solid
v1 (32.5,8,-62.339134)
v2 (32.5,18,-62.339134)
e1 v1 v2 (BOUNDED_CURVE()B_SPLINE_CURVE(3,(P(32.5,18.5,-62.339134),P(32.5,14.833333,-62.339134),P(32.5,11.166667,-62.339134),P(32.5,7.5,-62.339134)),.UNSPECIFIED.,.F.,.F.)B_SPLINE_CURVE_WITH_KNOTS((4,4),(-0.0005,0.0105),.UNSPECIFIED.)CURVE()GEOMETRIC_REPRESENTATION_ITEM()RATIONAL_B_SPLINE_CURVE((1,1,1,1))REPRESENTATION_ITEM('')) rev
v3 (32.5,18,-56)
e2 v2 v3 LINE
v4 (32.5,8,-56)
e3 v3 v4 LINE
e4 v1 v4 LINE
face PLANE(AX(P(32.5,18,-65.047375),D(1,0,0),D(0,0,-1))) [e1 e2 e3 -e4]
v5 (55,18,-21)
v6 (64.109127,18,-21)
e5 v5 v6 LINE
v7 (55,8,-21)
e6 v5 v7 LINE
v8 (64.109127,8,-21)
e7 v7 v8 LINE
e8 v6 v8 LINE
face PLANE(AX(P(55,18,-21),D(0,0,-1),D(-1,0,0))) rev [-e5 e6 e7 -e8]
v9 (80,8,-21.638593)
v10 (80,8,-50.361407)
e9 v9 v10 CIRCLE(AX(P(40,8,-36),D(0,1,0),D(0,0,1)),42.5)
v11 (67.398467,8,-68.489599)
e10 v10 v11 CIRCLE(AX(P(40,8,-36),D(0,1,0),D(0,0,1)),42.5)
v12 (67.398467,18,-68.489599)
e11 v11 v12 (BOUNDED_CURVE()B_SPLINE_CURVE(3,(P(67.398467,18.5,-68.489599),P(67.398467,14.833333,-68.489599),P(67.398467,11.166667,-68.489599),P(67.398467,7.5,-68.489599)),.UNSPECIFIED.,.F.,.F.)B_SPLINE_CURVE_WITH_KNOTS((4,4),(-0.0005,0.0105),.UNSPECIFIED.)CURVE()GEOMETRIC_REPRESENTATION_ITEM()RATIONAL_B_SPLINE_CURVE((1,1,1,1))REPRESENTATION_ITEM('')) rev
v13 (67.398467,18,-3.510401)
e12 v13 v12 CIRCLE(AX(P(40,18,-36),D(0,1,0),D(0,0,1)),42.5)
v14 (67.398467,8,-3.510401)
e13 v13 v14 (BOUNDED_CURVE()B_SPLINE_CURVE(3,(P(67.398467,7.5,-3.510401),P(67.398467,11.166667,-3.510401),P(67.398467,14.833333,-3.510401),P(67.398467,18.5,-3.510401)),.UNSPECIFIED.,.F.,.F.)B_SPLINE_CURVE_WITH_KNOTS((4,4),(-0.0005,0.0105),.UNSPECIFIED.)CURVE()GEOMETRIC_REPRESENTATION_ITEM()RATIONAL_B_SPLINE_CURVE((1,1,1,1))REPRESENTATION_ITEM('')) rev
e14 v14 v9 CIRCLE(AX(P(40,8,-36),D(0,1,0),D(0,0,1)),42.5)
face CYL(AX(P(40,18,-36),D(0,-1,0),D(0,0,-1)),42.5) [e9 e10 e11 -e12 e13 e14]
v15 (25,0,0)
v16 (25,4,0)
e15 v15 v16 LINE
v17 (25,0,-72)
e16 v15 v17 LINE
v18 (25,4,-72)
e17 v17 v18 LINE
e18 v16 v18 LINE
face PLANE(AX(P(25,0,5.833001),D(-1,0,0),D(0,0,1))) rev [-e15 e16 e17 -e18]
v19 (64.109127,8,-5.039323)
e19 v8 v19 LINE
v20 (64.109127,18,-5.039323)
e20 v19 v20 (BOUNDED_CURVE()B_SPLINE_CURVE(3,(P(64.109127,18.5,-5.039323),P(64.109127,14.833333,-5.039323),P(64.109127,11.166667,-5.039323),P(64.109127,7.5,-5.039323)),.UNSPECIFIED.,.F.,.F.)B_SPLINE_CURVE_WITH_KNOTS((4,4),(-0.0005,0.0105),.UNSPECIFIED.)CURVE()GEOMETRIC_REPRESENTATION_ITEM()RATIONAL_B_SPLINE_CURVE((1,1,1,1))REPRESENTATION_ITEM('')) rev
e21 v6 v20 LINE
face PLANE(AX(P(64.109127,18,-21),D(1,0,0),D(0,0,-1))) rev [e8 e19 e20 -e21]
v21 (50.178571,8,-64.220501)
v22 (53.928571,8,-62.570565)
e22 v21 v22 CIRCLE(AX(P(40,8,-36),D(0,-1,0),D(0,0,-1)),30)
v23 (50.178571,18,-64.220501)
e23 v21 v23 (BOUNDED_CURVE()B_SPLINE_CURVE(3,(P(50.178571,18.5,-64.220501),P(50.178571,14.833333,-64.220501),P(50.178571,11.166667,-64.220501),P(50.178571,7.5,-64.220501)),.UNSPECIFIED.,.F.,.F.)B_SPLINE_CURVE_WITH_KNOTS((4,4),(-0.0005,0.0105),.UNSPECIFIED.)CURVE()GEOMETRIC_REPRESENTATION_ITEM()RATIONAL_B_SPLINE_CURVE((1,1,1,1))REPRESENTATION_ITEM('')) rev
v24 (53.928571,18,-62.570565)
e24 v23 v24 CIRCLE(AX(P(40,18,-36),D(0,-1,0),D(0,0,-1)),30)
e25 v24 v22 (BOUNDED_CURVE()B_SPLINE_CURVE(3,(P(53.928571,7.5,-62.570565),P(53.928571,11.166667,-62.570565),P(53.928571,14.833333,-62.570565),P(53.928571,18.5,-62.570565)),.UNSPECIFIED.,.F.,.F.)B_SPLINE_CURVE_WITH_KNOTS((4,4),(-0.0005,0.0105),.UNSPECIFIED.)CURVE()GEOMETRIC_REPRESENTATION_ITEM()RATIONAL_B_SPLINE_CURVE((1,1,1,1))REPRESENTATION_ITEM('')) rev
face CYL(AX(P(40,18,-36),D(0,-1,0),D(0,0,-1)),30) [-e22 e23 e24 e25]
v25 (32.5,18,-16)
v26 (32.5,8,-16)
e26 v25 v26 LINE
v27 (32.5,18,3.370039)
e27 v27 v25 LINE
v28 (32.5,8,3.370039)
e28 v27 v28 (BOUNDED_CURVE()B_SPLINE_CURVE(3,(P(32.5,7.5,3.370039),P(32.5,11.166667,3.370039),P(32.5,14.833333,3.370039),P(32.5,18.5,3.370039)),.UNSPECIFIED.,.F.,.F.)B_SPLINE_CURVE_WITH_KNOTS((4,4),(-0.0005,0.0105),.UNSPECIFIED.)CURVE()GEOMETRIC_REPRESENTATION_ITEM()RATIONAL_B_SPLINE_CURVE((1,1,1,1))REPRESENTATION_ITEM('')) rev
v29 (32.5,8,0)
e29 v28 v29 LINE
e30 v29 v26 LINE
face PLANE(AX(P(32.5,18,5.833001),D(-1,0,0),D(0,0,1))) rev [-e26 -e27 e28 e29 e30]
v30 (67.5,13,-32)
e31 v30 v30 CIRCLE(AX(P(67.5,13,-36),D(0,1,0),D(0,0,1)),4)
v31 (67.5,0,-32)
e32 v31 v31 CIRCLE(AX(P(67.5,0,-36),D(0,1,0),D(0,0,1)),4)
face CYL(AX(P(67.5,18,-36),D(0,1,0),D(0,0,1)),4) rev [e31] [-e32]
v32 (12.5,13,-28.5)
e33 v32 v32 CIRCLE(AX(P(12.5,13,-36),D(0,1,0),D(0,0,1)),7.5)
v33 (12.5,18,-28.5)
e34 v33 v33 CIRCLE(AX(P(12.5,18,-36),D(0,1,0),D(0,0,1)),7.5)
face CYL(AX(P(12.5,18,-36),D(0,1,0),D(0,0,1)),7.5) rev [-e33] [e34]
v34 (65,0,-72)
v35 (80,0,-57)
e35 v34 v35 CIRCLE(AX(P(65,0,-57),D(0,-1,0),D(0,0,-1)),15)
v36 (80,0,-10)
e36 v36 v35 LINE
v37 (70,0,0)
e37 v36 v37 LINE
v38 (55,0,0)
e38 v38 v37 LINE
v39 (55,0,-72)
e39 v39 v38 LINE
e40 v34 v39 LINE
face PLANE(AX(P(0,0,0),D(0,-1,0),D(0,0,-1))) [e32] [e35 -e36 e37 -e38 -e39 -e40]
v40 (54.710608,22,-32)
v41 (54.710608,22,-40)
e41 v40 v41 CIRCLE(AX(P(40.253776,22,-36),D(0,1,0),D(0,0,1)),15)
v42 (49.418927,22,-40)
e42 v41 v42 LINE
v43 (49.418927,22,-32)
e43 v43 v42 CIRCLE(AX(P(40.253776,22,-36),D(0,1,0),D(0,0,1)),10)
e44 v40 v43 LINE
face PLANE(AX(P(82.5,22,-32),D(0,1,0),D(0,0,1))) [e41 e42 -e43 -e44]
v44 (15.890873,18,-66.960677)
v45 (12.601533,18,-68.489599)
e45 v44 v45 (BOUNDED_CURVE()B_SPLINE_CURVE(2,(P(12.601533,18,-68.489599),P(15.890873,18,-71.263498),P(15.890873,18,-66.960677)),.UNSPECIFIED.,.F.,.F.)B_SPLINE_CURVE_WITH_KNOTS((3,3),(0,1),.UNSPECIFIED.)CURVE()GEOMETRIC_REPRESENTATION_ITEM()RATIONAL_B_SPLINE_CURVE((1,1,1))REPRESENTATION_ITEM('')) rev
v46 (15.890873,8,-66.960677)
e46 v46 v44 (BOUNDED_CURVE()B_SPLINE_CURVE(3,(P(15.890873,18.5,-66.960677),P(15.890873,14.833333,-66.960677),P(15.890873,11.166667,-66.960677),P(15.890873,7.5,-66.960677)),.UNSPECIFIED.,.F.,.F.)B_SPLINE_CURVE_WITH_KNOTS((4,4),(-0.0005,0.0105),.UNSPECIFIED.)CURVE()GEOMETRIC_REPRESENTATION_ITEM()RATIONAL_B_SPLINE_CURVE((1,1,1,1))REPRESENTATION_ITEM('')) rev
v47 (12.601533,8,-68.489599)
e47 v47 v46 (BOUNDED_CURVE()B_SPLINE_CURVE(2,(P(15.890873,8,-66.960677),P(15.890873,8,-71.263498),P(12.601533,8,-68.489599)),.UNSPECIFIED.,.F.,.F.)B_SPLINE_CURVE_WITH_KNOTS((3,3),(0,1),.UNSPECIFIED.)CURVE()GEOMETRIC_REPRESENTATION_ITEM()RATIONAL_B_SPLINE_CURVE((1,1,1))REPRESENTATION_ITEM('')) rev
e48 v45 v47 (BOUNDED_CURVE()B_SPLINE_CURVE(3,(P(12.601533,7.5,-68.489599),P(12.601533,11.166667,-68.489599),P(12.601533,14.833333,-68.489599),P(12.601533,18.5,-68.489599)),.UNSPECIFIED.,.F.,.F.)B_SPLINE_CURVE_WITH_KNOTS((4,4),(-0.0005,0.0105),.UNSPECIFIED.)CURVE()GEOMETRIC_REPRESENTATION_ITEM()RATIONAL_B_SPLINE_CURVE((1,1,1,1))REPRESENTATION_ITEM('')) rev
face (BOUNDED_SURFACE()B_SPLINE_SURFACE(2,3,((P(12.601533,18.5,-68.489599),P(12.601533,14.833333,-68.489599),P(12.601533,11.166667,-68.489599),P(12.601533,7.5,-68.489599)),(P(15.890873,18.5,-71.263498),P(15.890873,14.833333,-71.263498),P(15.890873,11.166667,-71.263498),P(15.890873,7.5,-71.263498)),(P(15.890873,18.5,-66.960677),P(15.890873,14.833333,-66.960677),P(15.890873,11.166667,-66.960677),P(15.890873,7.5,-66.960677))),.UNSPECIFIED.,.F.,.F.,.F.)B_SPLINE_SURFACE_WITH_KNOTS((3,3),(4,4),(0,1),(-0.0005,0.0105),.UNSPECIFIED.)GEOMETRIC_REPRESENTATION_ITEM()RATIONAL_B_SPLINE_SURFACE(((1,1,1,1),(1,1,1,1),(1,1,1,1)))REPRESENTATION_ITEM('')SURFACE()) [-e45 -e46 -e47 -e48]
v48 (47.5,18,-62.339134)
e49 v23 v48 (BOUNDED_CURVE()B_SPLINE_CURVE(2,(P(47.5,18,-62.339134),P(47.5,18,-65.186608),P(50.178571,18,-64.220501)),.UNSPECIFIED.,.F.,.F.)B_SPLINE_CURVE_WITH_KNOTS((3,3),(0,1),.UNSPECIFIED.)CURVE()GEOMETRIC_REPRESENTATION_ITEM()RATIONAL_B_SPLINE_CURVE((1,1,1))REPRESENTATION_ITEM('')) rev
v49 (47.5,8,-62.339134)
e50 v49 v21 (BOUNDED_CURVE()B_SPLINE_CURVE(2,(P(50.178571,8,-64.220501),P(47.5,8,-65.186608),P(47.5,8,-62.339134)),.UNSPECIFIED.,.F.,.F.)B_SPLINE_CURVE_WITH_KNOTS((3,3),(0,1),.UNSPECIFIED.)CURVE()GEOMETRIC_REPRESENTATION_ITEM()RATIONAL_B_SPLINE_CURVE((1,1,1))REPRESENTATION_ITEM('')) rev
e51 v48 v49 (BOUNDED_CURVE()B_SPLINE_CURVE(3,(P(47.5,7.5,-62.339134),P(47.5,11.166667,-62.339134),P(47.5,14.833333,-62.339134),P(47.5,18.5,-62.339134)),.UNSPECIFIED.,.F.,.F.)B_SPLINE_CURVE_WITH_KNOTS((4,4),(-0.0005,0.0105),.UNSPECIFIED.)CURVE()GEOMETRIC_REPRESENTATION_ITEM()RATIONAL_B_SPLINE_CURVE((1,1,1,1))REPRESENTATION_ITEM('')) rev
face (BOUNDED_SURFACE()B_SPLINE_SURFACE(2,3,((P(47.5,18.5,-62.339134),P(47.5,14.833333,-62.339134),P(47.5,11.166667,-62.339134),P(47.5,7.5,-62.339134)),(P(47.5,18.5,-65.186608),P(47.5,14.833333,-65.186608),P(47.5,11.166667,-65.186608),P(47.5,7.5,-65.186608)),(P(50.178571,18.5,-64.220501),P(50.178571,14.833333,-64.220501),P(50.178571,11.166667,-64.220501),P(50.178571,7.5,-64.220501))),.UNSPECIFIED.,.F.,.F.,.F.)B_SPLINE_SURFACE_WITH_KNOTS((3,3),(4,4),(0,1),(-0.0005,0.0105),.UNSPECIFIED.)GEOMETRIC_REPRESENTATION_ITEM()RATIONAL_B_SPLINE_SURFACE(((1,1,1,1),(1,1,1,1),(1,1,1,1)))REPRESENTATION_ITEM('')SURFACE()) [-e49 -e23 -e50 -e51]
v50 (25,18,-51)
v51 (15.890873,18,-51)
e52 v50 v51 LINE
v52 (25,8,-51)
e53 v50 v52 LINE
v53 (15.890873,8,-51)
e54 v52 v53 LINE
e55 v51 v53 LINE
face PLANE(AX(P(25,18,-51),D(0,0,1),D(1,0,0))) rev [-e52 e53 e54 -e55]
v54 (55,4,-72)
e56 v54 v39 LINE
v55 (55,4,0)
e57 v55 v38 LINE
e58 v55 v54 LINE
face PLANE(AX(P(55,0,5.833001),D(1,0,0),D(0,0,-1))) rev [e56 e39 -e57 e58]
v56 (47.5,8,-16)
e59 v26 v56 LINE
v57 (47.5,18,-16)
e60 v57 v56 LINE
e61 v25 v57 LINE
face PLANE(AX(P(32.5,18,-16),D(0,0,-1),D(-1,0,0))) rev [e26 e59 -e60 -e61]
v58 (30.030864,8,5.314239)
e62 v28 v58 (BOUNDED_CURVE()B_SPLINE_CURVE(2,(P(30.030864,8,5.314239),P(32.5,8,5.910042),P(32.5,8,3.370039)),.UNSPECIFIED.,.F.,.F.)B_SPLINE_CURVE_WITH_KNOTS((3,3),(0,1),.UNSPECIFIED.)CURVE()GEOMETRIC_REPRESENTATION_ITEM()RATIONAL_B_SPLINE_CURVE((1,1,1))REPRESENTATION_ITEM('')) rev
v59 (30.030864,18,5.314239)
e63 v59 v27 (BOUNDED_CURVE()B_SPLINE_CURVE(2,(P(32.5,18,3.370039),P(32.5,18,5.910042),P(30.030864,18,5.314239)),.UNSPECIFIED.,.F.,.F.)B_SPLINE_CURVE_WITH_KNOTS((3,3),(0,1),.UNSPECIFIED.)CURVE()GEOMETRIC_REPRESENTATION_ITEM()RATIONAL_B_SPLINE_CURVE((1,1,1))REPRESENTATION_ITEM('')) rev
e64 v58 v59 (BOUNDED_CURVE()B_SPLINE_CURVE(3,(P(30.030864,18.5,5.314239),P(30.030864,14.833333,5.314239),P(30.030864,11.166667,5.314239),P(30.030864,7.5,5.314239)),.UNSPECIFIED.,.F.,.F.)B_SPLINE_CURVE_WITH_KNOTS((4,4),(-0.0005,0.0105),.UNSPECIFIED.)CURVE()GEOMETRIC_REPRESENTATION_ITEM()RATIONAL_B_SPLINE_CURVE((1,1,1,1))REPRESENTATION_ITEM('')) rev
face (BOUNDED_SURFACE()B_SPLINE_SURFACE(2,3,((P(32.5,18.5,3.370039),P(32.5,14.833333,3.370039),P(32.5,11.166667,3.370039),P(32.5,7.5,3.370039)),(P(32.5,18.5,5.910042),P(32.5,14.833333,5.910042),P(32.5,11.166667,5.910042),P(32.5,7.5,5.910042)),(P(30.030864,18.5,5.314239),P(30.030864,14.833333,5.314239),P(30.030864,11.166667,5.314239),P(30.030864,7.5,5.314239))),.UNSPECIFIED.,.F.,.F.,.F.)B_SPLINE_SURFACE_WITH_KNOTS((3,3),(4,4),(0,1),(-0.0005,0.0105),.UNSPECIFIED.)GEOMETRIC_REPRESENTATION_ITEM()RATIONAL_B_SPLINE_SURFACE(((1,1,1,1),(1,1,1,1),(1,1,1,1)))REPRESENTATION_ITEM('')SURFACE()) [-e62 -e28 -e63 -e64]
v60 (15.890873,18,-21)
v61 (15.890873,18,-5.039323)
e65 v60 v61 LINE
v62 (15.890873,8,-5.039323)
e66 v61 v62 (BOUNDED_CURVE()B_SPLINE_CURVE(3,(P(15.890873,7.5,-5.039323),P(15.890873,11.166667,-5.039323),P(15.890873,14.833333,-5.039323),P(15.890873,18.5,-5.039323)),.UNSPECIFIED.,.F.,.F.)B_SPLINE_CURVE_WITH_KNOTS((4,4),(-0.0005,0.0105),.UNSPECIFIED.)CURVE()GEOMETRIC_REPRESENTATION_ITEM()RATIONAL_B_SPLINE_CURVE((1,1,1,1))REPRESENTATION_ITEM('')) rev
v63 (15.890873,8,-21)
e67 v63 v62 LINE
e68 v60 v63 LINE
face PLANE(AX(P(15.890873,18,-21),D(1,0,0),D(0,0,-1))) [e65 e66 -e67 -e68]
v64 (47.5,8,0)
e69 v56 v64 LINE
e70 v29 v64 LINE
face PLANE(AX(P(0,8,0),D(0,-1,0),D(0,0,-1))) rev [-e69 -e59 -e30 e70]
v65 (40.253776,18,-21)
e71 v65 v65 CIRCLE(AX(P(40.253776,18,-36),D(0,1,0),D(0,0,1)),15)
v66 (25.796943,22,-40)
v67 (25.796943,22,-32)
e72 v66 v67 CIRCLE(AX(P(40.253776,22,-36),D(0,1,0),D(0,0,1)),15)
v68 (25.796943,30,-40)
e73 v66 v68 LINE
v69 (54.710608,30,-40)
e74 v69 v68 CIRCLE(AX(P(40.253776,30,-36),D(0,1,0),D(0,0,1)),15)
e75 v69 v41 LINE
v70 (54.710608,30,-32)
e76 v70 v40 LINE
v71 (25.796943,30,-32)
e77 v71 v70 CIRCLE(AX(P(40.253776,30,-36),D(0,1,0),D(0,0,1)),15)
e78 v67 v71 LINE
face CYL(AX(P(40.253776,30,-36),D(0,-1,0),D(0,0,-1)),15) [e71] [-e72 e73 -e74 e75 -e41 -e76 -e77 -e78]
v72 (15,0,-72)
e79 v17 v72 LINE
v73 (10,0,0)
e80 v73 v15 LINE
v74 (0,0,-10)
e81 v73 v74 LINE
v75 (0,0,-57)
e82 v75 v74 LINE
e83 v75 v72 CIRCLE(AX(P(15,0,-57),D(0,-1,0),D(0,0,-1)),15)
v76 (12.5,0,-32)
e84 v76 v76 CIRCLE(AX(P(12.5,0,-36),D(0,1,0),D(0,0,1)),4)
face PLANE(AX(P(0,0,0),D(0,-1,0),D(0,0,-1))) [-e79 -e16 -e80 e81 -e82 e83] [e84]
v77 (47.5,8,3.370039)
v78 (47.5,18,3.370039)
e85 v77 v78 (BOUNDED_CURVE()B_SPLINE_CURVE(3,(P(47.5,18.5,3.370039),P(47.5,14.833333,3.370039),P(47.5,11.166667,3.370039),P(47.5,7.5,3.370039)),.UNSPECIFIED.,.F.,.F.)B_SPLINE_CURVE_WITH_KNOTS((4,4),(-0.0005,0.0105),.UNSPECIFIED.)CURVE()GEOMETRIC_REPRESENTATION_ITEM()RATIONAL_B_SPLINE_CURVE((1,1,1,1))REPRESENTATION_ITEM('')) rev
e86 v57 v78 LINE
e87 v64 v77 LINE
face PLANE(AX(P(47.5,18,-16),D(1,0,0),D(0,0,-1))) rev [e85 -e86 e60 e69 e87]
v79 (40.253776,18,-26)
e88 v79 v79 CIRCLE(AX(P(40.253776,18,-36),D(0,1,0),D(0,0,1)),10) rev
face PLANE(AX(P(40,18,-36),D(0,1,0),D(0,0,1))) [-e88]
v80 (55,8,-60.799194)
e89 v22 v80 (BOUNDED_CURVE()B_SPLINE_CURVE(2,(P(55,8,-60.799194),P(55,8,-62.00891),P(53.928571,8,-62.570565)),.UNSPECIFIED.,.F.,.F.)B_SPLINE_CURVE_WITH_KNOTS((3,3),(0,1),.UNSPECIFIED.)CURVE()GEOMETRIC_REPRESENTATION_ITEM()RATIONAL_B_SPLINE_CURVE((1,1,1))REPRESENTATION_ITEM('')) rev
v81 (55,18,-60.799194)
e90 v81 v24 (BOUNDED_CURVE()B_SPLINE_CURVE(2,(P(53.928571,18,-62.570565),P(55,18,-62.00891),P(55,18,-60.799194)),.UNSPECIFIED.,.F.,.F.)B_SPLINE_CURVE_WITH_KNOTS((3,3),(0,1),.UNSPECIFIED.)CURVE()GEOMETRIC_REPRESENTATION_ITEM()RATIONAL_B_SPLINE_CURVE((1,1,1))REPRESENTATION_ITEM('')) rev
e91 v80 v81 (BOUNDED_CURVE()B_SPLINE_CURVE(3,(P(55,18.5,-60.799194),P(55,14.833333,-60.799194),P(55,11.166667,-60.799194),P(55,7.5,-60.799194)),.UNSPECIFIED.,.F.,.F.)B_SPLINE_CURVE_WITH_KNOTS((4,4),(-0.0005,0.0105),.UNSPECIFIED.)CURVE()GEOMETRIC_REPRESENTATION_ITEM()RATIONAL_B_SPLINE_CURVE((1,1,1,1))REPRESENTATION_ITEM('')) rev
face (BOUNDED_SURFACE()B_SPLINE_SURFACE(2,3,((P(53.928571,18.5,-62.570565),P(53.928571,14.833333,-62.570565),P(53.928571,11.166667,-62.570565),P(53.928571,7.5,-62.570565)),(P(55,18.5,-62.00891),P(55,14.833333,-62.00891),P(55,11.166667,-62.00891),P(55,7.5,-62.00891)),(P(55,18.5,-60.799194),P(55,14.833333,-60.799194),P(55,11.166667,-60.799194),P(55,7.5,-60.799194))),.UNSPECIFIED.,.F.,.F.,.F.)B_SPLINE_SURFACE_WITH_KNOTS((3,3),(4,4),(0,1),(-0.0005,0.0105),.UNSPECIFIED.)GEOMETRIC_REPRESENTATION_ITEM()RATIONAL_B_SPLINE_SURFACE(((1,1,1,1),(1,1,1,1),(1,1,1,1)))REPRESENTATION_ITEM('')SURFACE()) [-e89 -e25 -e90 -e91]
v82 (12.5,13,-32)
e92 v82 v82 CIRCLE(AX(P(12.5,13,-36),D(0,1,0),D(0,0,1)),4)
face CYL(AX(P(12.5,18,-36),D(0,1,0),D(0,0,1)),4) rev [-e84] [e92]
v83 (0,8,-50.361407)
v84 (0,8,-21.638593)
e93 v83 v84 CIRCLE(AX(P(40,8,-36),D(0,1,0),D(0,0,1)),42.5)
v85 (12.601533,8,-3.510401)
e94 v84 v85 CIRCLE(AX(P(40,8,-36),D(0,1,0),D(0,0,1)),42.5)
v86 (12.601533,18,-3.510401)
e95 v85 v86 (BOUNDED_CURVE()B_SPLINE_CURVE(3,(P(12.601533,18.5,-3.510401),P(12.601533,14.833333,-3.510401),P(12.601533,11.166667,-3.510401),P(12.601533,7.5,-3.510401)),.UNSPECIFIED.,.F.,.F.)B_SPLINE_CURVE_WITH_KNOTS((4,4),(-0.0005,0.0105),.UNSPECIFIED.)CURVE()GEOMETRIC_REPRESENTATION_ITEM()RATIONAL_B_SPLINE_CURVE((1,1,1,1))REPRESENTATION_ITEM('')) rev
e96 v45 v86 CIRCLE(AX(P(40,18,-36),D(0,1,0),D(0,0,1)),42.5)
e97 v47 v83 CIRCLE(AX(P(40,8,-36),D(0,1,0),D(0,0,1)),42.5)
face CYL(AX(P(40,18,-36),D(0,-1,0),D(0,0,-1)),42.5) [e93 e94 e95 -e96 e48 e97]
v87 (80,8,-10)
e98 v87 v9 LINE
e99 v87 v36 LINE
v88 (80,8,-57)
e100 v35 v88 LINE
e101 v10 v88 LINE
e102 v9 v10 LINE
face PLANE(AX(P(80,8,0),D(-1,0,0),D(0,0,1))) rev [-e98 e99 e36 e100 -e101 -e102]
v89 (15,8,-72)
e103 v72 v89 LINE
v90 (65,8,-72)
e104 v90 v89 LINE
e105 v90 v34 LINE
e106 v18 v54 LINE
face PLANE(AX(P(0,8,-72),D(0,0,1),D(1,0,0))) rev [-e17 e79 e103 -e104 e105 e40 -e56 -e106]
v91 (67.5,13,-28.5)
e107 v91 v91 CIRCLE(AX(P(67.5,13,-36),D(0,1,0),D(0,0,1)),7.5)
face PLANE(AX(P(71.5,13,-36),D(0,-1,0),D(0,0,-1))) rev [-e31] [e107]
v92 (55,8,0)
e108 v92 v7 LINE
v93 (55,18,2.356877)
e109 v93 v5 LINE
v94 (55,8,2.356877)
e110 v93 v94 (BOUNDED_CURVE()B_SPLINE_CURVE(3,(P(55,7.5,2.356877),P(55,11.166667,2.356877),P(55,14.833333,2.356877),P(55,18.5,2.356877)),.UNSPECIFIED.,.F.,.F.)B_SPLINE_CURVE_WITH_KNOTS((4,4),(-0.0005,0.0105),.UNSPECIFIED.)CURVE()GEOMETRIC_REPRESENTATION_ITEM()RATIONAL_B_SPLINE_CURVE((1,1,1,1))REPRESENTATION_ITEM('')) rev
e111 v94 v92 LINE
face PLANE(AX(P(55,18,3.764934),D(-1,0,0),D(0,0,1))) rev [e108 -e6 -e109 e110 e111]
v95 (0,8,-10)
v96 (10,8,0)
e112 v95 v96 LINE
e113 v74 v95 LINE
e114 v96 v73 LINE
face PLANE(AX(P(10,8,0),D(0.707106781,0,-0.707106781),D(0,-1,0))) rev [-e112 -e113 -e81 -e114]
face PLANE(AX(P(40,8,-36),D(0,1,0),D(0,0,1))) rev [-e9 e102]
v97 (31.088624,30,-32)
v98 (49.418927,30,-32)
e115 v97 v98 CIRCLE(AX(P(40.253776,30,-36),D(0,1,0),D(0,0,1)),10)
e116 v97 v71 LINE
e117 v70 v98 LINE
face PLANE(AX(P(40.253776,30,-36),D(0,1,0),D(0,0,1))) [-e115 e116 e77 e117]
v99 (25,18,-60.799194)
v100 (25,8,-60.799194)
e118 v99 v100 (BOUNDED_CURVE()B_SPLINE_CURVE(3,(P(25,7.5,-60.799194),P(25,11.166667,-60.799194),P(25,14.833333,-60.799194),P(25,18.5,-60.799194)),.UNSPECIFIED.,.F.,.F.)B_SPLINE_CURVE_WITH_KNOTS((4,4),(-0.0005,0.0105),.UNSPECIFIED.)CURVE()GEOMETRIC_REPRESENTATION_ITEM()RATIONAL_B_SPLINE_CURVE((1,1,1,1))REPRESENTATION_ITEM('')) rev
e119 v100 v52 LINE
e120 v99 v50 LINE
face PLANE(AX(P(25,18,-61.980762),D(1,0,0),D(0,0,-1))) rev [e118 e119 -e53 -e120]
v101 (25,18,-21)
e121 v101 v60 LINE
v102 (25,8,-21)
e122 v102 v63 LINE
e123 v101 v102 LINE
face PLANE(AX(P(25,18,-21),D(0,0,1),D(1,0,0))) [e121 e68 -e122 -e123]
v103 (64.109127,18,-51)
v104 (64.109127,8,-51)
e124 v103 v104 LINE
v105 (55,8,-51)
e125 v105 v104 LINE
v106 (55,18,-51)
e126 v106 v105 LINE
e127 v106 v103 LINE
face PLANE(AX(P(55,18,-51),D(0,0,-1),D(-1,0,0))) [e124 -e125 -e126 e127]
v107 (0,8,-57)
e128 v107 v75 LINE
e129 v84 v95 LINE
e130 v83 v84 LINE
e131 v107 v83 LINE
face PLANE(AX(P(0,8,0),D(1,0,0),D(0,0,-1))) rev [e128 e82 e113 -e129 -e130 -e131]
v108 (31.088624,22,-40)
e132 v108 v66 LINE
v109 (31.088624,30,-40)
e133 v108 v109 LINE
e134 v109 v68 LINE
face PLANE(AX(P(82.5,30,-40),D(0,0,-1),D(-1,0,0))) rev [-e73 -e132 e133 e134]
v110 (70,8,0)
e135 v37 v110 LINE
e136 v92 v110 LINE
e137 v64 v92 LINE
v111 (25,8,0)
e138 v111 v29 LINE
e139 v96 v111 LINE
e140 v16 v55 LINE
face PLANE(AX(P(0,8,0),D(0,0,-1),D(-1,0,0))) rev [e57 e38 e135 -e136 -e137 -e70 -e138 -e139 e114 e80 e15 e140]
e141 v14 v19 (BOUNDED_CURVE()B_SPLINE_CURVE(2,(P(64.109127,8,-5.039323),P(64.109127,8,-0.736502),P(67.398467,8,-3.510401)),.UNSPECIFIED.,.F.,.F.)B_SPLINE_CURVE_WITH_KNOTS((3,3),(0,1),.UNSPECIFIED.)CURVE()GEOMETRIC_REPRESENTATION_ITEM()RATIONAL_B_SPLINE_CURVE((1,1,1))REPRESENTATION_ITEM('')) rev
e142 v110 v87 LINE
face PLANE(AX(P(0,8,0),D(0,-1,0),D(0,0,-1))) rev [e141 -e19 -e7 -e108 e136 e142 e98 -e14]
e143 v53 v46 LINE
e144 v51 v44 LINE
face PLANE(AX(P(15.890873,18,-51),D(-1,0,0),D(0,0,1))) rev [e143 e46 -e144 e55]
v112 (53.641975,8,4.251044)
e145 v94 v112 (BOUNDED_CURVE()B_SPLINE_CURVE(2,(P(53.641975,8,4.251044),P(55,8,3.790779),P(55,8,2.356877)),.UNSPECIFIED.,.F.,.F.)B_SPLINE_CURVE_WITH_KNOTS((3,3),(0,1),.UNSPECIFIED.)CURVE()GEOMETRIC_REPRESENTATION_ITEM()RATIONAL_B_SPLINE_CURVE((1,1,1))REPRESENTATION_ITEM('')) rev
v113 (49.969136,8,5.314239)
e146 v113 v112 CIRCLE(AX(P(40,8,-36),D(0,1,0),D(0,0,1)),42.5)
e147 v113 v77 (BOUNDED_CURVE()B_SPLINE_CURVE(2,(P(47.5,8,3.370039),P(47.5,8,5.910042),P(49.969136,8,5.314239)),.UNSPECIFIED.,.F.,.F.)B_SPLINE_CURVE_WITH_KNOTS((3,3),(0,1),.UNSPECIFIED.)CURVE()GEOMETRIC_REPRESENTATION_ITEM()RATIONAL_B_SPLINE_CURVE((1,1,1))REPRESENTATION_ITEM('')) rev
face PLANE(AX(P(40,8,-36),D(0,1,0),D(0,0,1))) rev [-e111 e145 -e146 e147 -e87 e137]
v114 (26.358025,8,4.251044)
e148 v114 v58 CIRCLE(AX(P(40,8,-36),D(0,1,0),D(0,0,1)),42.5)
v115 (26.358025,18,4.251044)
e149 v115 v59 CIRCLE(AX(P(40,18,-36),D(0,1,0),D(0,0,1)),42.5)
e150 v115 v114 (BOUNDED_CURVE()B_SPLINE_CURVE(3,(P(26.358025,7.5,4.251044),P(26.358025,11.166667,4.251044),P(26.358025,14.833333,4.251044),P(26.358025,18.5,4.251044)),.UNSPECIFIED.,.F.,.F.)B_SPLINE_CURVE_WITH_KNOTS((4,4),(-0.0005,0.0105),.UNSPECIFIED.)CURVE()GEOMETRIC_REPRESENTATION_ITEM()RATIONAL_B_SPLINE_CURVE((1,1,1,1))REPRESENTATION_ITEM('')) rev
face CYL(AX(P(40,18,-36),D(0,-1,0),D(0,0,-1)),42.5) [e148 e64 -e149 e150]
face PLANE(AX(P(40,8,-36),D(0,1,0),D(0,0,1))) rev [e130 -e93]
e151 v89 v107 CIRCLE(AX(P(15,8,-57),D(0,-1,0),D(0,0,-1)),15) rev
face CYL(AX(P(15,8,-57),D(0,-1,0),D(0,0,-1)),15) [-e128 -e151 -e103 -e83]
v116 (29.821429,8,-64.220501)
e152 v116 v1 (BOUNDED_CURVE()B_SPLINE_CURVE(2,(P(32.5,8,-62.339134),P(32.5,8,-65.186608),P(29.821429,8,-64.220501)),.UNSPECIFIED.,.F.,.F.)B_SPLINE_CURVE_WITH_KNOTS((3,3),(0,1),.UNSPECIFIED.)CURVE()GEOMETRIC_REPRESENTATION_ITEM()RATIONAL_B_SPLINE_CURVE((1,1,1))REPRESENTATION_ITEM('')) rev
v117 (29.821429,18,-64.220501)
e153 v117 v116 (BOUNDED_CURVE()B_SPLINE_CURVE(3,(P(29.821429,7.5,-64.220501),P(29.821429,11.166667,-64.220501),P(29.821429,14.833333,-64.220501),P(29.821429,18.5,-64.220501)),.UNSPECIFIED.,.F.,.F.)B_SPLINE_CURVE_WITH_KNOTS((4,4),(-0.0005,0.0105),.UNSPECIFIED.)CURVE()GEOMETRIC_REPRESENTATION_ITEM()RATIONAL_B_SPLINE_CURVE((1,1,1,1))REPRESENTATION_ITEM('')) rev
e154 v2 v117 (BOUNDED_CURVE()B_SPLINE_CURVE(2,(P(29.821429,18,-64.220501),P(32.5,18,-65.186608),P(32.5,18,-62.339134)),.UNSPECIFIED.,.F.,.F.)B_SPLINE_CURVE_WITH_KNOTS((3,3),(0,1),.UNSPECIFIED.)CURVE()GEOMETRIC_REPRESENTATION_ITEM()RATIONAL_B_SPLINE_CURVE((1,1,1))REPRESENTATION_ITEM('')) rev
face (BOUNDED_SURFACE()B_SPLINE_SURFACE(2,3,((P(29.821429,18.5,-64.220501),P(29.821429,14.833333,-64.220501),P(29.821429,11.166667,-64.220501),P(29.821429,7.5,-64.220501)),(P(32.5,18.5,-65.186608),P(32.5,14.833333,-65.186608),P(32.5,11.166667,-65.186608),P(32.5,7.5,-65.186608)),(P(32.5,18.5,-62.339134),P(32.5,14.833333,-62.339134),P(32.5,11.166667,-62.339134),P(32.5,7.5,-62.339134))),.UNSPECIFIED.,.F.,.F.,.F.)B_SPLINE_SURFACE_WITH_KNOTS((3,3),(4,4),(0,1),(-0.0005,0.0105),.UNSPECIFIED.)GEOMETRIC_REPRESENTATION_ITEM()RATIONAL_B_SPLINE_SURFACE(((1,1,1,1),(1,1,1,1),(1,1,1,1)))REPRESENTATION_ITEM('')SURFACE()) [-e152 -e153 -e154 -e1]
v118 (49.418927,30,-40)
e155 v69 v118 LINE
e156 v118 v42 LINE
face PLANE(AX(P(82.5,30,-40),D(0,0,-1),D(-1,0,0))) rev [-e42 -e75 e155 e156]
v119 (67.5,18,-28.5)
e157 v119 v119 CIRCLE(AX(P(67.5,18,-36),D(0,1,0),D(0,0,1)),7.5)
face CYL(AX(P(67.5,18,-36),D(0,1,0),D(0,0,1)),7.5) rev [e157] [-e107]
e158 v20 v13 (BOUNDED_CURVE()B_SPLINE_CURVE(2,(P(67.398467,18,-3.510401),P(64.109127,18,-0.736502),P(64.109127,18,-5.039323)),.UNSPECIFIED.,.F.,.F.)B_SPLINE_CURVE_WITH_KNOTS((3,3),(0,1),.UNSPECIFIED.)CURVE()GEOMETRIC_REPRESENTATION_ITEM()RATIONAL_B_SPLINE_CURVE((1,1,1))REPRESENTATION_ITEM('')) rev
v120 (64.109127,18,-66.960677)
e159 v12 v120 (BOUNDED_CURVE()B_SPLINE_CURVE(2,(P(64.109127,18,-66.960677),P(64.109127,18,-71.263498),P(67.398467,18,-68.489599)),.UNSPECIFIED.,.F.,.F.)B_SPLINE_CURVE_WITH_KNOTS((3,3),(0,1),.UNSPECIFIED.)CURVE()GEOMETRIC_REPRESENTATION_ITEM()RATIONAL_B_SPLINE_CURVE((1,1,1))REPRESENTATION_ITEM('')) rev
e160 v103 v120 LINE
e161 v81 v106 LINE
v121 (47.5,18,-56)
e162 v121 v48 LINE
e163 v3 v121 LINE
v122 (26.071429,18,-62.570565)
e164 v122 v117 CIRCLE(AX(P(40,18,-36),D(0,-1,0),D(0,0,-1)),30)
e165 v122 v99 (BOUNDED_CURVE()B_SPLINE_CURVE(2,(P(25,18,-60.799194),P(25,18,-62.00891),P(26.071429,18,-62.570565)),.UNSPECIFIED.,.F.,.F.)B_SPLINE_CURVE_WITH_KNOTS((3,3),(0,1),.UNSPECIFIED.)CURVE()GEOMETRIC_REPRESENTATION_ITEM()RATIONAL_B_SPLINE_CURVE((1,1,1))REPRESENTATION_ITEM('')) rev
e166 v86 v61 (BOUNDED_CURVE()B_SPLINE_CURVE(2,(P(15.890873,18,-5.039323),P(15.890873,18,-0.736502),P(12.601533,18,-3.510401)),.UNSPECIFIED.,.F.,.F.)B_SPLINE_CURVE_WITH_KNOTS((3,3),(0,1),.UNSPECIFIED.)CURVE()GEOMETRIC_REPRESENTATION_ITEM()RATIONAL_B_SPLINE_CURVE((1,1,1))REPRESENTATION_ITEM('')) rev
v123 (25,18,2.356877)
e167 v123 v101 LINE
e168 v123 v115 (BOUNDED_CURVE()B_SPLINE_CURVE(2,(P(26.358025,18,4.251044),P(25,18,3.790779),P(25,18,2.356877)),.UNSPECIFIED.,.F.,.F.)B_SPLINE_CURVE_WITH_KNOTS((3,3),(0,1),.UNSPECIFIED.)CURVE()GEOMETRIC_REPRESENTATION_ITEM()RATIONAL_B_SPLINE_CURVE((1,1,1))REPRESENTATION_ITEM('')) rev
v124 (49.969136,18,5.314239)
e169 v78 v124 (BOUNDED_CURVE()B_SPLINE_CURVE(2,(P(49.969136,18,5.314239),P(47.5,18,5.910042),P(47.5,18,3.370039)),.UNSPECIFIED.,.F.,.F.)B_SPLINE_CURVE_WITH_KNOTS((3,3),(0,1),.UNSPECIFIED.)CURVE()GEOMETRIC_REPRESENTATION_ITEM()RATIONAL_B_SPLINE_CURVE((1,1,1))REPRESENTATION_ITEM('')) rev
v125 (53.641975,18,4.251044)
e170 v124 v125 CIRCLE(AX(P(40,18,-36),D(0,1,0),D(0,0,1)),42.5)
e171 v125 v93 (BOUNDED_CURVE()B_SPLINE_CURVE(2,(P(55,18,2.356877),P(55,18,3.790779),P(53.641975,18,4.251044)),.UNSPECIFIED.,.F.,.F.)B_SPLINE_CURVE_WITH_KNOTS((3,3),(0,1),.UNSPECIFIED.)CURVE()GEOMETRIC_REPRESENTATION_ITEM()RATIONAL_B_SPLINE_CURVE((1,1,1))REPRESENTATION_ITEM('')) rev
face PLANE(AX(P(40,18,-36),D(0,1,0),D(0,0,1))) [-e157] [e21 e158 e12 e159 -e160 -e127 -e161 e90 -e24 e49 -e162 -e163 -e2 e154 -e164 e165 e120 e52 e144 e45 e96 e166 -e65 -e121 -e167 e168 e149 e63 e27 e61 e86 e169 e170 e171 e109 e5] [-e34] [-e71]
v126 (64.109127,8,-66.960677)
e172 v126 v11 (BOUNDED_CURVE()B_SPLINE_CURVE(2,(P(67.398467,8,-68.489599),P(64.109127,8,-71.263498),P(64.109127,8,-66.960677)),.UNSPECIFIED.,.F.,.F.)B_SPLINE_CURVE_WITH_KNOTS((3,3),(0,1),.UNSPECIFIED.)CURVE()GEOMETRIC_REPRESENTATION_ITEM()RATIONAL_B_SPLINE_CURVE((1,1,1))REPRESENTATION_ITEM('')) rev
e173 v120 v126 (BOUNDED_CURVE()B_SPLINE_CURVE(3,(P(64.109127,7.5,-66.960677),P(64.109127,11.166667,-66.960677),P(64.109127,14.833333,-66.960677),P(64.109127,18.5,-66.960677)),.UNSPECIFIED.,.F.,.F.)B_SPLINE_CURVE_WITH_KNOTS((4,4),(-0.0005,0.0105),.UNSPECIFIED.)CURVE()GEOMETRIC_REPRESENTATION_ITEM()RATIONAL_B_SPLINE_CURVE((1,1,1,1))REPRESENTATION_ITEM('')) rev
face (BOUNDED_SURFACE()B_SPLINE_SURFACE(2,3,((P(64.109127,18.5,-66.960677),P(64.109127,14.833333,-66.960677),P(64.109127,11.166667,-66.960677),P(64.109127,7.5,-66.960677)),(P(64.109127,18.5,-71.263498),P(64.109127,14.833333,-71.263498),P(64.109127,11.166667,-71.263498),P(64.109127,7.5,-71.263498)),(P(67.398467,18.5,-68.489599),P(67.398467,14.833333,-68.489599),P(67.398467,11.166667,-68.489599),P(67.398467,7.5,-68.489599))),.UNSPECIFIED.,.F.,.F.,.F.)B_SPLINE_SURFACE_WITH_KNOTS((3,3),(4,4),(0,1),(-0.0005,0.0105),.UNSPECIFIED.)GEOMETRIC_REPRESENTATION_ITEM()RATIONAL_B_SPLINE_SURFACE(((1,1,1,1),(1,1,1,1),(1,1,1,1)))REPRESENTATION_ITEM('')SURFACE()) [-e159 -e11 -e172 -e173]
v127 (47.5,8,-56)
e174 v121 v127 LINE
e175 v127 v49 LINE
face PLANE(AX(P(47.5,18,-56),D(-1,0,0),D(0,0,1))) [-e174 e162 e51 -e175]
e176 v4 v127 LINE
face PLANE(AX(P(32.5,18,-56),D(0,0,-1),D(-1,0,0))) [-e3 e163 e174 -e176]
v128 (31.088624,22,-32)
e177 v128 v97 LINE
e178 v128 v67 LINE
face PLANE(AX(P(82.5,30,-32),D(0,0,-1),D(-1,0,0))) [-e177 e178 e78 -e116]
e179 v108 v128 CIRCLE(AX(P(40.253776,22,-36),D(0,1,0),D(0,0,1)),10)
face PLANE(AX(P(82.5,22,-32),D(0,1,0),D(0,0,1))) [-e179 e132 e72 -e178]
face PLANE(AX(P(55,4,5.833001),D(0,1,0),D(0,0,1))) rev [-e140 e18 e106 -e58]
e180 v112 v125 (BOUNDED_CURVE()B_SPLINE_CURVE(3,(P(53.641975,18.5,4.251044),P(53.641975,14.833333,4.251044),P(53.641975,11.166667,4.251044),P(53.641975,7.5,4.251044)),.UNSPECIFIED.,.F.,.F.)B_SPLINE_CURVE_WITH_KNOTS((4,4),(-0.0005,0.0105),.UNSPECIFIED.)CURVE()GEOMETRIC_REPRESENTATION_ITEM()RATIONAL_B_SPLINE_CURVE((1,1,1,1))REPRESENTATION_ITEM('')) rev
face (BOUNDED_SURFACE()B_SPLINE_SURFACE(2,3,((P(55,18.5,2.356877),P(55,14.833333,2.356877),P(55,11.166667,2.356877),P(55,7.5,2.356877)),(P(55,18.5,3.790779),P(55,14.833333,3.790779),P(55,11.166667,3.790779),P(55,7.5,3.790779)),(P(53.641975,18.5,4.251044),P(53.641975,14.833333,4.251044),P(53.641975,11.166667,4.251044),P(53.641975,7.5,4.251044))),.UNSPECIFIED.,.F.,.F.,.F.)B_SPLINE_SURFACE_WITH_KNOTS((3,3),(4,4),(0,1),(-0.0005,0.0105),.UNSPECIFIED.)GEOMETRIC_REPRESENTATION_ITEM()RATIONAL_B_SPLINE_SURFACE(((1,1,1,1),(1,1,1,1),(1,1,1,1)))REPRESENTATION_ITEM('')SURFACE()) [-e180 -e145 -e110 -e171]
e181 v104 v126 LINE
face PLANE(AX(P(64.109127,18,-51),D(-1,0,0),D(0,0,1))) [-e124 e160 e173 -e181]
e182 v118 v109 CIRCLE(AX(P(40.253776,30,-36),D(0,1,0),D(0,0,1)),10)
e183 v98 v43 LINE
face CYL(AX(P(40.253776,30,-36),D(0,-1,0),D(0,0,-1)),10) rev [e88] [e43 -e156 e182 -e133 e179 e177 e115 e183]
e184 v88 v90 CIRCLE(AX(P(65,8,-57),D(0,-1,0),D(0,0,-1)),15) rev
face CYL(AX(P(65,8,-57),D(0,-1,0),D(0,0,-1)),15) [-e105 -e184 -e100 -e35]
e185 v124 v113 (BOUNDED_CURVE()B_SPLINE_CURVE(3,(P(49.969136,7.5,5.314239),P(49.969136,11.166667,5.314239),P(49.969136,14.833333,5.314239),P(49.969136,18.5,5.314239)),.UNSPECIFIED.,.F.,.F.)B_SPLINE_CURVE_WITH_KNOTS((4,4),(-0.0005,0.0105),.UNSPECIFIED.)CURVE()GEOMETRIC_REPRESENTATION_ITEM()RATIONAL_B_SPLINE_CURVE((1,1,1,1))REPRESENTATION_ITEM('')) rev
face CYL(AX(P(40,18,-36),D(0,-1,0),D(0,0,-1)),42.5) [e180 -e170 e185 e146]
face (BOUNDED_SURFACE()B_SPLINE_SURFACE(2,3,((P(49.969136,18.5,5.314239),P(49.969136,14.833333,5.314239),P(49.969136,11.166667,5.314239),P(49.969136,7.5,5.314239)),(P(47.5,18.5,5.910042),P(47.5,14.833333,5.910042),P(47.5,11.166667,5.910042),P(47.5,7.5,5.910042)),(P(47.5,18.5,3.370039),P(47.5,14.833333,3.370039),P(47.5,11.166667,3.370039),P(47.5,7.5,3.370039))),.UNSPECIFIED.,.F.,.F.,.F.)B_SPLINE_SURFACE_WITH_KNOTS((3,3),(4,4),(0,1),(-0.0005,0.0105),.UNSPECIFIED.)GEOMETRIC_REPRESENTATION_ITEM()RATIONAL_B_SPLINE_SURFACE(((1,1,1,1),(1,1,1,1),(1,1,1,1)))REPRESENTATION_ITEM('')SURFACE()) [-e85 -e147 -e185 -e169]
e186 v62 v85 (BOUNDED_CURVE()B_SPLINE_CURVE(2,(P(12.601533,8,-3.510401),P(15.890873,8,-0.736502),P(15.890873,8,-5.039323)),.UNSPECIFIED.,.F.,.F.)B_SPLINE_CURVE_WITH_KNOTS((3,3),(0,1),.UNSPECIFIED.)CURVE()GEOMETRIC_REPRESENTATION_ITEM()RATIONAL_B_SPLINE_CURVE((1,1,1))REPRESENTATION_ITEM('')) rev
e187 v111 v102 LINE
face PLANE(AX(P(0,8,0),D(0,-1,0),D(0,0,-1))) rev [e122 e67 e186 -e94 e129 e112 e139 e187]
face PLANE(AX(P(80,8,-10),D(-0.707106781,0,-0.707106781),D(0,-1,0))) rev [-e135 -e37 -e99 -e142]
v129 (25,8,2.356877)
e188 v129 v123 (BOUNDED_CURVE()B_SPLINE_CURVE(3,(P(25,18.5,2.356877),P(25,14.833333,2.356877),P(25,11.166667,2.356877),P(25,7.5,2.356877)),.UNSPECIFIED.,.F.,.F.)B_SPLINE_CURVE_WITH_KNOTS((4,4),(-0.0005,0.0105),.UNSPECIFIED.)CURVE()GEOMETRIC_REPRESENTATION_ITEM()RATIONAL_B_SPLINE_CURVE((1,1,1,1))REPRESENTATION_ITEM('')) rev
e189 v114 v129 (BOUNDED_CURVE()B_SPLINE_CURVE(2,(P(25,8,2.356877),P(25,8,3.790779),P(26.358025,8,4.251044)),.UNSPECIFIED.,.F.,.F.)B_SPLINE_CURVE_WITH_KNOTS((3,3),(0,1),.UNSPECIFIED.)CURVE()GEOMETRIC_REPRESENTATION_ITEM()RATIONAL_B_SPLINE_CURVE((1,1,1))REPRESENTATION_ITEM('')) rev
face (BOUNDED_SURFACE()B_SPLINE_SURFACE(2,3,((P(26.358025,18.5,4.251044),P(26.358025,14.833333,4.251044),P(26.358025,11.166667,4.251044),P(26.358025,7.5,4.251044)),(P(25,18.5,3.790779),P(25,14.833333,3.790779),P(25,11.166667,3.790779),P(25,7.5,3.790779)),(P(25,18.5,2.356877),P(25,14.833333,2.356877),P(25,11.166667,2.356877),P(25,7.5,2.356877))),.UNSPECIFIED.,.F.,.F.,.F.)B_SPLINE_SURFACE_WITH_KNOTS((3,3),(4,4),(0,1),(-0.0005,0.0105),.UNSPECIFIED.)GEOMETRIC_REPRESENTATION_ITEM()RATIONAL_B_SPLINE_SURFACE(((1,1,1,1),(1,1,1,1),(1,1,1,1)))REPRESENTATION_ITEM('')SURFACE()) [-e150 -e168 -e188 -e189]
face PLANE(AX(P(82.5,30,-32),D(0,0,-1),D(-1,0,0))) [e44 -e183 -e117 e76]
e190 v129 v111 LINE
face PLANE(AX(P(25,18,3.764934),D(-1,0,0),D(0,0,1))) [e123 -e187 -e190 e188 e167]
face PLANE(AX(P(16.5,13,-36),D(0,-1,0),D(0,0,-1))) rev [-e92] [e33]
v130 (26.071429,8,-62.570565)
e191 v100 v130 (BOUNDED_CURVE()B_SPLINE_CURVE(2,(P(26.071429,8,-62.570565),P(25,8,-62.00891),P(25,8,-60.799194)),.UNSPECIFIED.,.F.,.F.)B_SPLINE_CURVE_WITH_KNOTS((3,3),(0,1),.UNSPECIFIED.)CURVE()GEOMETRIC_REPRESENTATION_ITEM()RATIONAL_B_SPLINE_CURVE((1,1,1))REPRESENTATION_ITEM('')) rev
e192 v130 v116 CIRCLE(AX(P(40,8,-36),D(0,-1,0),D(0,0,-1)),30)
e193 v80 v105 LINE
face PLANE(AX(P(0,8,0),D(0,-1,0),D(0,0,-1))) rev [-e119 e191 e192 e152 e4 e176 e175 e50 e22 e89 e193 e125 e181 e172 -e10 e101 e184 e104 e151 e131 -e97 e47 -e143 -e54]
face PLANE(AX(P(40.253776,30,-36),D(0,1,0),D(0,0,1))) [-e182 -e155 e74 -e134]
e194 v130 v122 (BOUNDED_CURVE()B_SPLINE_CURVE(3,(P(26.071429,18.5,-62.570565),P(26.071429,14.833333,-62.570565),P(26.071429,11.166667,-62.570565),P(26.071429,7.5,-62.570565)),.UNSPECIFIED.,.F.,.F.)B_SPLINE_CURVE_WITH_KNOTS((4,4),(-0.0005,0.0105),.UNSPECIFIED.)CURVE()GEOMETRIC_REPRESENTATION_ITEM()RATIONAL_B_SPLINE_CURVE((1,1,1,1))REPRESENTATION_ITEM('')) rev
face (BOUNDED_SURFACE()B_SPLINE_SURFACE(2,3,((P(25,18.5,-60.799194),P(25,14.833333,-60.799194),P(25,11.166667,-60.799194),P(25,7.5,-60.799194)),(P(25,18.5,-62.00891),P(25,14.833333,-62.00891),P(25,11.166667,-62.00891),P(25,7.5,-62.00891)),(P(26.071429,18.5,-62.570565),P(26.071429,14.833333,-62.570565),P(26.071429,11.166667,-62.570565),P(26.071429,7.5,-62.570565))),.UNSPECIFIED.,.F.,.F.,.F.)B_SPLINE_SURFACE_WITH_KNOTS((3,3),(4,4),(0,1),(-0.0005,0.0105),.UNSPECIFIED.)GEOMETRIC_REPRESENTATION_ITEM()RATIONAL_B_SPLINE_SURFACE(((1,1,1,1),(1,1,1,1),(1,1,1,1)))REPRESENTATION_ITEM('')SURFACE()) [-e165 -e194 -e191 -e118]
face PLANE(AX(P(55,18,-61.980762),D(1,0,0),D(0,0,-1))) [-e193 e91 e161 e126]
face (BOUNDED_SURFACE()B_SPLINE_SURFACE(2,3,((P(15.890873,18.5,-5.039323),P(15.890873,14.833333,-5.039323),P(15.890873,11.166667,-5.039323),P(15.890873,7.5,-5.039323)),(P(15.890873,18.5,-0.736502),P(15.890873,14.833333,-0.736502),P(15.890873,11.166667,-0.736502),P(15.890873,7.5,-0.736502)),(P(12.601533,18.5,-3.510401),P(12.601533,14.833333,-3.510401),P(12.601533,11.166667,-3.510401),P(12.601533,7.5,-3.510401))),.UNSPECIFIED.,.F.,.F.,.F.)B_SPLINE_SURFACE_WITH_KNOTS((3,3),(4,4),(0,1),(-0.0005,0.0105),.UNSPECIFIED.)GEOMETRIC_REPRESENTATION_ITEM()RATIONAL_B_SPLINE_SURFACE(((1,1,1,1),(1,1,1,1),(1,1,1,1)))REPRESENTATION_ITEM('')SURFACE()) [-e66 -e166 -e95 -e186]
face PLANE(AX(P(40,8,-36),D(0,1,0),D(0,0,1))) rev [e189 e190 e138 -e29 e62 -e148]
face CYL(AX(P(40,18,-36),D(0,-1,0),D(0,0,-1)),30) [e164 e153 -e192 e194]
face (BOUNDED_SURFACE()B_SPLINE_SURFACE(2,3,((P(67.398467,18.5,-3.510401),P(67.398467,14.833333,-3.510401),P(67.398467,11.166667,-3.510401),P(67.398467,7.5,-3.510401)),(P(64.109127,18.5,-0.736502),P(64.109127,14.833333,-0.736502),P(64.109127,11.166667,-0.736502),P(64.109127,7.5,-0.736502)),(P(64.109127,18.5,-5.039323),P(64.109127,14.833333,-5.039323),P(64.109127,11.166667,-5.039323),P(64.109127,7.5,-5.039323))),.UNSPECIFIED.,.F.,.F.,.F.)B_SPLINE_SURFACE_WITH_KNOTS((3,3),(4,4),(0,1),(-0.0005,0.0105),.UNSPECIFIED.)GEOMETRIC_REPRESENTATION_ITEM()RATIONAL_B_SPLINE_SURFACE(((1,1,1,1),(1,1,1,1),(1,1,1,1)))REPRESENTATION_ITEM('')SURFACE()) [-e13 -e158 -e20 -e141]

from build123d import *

# Parameters (mm, degrees)
SKETCH2_W                                = 80
SKETCH2_H                                = 72
BOSS_EXTRUDE1_DEPTH                      = 8
BOSS_EXTRUDE2_DEPTH                      = 10
CHAMFER1_SIZE                            = 10
FILLET1_R                                = 15
SKETCH4_R                                = 15
SKETCH4_R_2                              = 10
BOSS_EXTRUDE3_DEPTH                      = 12
SKETCH5_W                                = 8
SKETCH5_H                                = 8
CUT_EXTRUDE1_DEPTH                       = 114.535236821
CBORE_FOR_M10_HEX_HEAD_BOLT1_D           = 8
CBORE_FOR_M10_HEX_HEAD_BOLT1_CBORE_D     = 15
CBORE_FOR_M10_HEX_HEAD_BOLT1_CBORE_DEPTH = 5
SKETCH8_W                                = 30
SKETCH8_H                                = 4
CUT_EXTRUDE2_DEPTH                       = 118.321038589


with BuildPart() as part:
    # Sketch2 → Boss-Extrude1 (new body)
    with BuildSketch(Plane(origin=(0, 0, 0), x_dir=(1, 0, 0), z_dir=(0, 1, 0))):
        with Locations((40, 36)):
            Rectangle(SKETCH2_W, SKETCH2_H)
    extrude(amount=BOSS_EXTRUDE1_DEPTH)

    # Sketch3 → Boss-Extrude2 (add)
    with BuildSketch(Plane(origin=(0, 8, 0), x_dir=(1, 0, 0), z_dir=(0, 1, 0))):
        with BuildLine():
            Line((32.5, 65.047375097), (32.5, 56))
            Line((32.5, 56), (47.5, 56))
            Line((47.5, 56), (47.5, 65.047375097))
            ThreePointArc((47.5, 65.047375097), (51.354009371, 63.768443802), (55, 61.980762114))
            Line((55, 61.980762114), (55, 51))
            Line((55, 51), (64.109126902, 51))
            Line((64.109126902, 51), (64.109126902, 71))
            ThreePointArc((64.109126902, 71), (82.5, 36), (64.109126902, 1))
            Line((64.109126902, 1), (64.109126902, 21))
            Line((64.109126902, 21), (55, 21))
            Line((55, 21), (55, -3.764934301))
            ThreePointArc((55, -3.764934301), (51.297421179, -4.970944274), (47.5, -5.833001327))
            Line((47.5, -5.833001327), (47.5, 16))
            Line((47.5, 16), (32.5, 16))
            Line((32.5, 16), (32.5, -5.833001327))
            ThreePointArc((32.5, -5.833001327), (28.702578821, -4.970944274), (25, -3.764934301))
            Line((25, -3.764934301), (25, 21))
            Line((25, 21), (15.890873098, 21))
            Line((15.890873098, 21), (15.890873098, 1))
            ThreePointArc((15.890873098, 1), (-2.5, 36), (15.890873098, 71))
            Line((15.890873098, 71), (15.890873098, 51))
            Line((15.890873098, 51), (25, 51))
            Line((25, 51), (25, 61.980762114))
            ThreePointArc((25, 61.980762114), (28.645990629, 63.768443802), (32.5, 65.047375097))
        make_face()
    extrude(amount=BOSS_EXTRUDE2_DEPTH)

    # Chamfer1
    chamfer1_edges = [part.edges().sort_by_distance(p)[0] for p in [
        (80, 4, 0),
        (0, 4, 0),
    ]]
    chamfer(chamfer1_edges, length=CHAMFER1_SIZE)

    # Fillet1
    fillet1_edges = [part.edges().sort_by_distance(p)[0] for p in [
        (0, 4, -72),
        (80, 4, -72),
    ]]
    fillet(fillet1_edges, radius=FILLET1_R)

    # Sketch4 → Boss-Extrude3 (add)
    with BuildSketch(Plane(origin=(0, 18, 0), x_dir=(1, 0, 0), z_dir=(0, 1, 0))):
        with Locations(Location((40.253775516, 36, 0), (0, 0, 270))):
            Circle(SKETCH4_R)
        with Locations(Location((40.253775516, 36, 0), (0, 0, 270))):
            Circle(SKETCH4_R_2, mode=Mode.SUBTRACT)
    extrude(amount=BOSS_EXTRUDE3_DEPTH)

    # Sketch5 → Cut-Extrude1 (cut, through all)
    with BuildSketch(Plane(origin=(0, 0, 0), x_dir=(0, 0, -1), z_dir=(1, 0, 0))):
        with Locations((36, 26)):
            Rectangle(SKETCH5_W, SKETCH5_H)
    extrude(amount=CUT_EXTRUDE1_DEPTH, mode=Mode.SUBTRACT)

    # CBORE for M10 Hex Head Bolt1 (through all)
    with Locations(Plane(origin=(0, 18, 0), x_dir=(1, 0, 0), z_dir=(0, 1, 0))):
        with Locations((67.5, 36), (12.5, 36)):
            CounterBoreHole(CBORE_FOR_M10_HEX_HEAD_BOLT1_D / 2, CBORE_FOR_M10_HEX_HEAD_BOLT1_CBORE_D / 2, CBORE_FOR_M10_HEX_HEAD_BOLT1_CBORE_DEPTH)

    # Sketch8 → Cut-Extrude2 (cut, through all)
    with BuildSketch(Plane(origin=(0, 0, -72), x_dir=(-1, 0, 0), z_dir=(0, 0, -1))):
        with Locations((-40, 2)):
            Rectangle(SKETCH8_W, SKETCH8_H)
    extrude(amount=-CUT_EXTRUDE2_DEPTH, mode=Mode.SUBTRACT)

    # Fillet2
    # a fillet whose section is not a circle: 2 mm, written as the material it takes off along each edge
    with BuildSketch(Plane(origin=(64.109126902, 8, -71), x_dir=(0.7949377645481589, 0, 0.6066909843529702), z_dir=(0, 1, 0)), Plane(origin=(15.890873098, 8, -1), x_dir=(-0.7949377645481593, 0, -0.6066909843529693), z_dir=(0, 1, 0))) as fillet2_piece_1:
        with BuildLine():
            Bezier((4.137858015, 0), (-0.159861677, 0.20946427), (2.45062112, -3.211010754), weights=[1, 1, 1])
            Line((2.45062112, -3.211010754), (0, 0))
            ThreePointArc((0, 0), (2.068929007, 0.050388308), (4.137858015, 0))
        make_face()
    extrude(amount=20.344645036, mode=Mode.SUBTRACT)
    with BuildSketch(Plane(origin=(15.890873098, 8, -71), x_dir=(-0.794937764548161, 0, 0.6066909843529674), z_dir=(0, 1, 0)), Plane(origin=(64.109126902, 8, -1), x_dir=(0.7949377645481593, 0, -0.6066909843529698), z_dir=(0, 1, 0))) as fillet2_piece_2:
        with BuildLine():
            Bezier((4.137858015, 0), (-0.159861677, -0.20946427), (2.45062112, 3.211010754), weights=[1, 1, 1])
            Line((2.45062112, 3.211010754), (0, 0))
            ThreePointArc((0, 0), (2.068929007, -0.050388308), (4.137858015, 0))
        make_face()
    extrude(amount=20.344645036, mode=Mode.SUBTRACT)
    with BuildSketch(Plane(origin=(55, 4.393986535, 3.764934301), x_dir=(0, 0, -1), z_dir=(0, 1, 0))) as fillet2_piece_3:
        with BuildLine():
            Bezier((1.408057473, 0), (-0.025844464, 0), (-0.486109283, 1.358024691), weights=[1, 1, 1])
            ThreePointArc((-0.486109283, 1.358024691), (-0.248816298, 0.676949942), (0, 0))
            Line((0, 0), (1.408057473, 0))
        make_face()
    extrude(amount=17.21202693, mode=Mode.SUBTRACT)
    with BuildSketch(Plane(origin=(47.5, 1.692392429, 5.833001327), x_dir=(0, 0, -1), z_dir=(0, 1, 0))) as fillet2_piece_4:
        with BuildLine():
            Bezier((2.462961957, 0), (-0.077040583, 0), (0.518762482, -2.469135802), weights=[1, 1, 1])
            ThreePointArc((0.518762482, -2.469135802), (0.241054451, -1.238418338), (0, 0))
            Line((0, 0), (2.462961957, 0))
        make_face()
    extrude(amount=22.615215142, mode=Mode.SUBTRACT)
    with BuildSketch(Plane(origin=(32.5, 1.692392429, 5.833001327), x_dir=(0, 0, -1), z_dir=(0, 1, 0))) as fillet2_piece_5:
        with BuildLine():
            Bezier((2.462961957, 0), (-0.077040583, 0), (0.518762482, 2.469135802), weights=[1, 1, 1])
            ThreePointArc((0.518762482, 2.469135802), (0.241054451, 1.238418338), (0, 0))
            Line((0, 0), (2.462961957, 0))
        make_face()
    extrude(amount=22.615215142, mode=Mode.SUBTRACT)
    with BuildSketch(Plane(origin=(25, 4.393986535, 3.764934301), x_dir=(0, 0, -1), z_dir=(0, 1, 0))) as fillet2_piece_6:
        with BuildLine():
            Bezier((1.408057473, 0), (-0.025844464, 0), (-0.486109283, -1.358024691), weights=[1, 1, 1])
            ThreePointArc((-0.486109283, -1.358024691), (-0.248816298, -0.676949942), (0, 0))
            Line((0, 0), (1.408057473, 0))
        make_face()
    extrude(amount=17.21202693, mode=Mode.SUBTRACT)
    with BuildSketch(Plane(origin=(55, 8, -61.980762114), x_dir=(0, 0, 1), z_dir=(0, 1, 0))) as fillet2_piece_7:
        with BuildLine():
            Bezier((1.181568578, 0), (-0.02814818, 0), (-0.589802389, -1.071428571), weights=[1, 1, 1])
            ThreePointArc((-0.589802389, -1.071428571), (-0.30036176, -0.532708341), (0, 0))
            Line((0, 0), (1.181568578, 0))
        make_face()
    extrude(amount=13.057599182, mode=Mode.SUBTRACT)
    with BuildSketch(Plane(origin=(47.5, 8, -65.047375097), x_dir=(0, 0, 1), z_dir=(0, 1, 0))) as fillet2_piece_8:
        with BuildLine():
            Bezier((2.708240714, 0), (-0.139233273, 0), (0.826873973, 2.678571429), weights=[1, 1, 1])
            ThreePointArc((0.826873973, 2.678571429), (0.382133114, 1.348949208), (0, 0))
            Line((0, 0), (2.708240714, 0))
        make_face()
    extrude(amount=17.008238663, mode=Mode.SUBTRACT)
    with BuildSketch(Plane(origin=(32.5, 8, -65.047375097), x_dir=(-0.9555080660857783, 0, 0.294964973590113), z_dir=(0, 1, 0))) as fillet2_piece_9:
        with BuildLine():
            Bezier((2.803295465, 0), (-0.041068939, -0.133038515), (0.798836151, 2.587745848), weights=[1, 1, 1])
            Line((0.798836151, 2.587745848), (0, 0))
            ThreePointArc((0, 0), (1.401647733, -0.032761495), (2.803295465, 0))
        make_face()
    extrude(amount=17.008238663, mode=Mode.SUBTRACT)
    with BuildSketch(Plane(origin=(25, 8, -61.980762114), x_dir=(0, 0, 1), z_dir=(0, 1, 0))) as fillet2_piece_10:
        with BuildLine():
            Bezier((1.181568578, 0), (-0.02814818, 0), (-0.589802389, 1.071428571), weights=[1, 1, 1])
            ThreePointArc((-0.589802389, 1.071428571), (-0.30036176, 0.532708341), (0, 0))
            Line((0, 0), (1.181568578, 0))
        make_face()
    extrude(amount=13.057599182, mode=Mode.SUBTRACT)


solid = part.part
